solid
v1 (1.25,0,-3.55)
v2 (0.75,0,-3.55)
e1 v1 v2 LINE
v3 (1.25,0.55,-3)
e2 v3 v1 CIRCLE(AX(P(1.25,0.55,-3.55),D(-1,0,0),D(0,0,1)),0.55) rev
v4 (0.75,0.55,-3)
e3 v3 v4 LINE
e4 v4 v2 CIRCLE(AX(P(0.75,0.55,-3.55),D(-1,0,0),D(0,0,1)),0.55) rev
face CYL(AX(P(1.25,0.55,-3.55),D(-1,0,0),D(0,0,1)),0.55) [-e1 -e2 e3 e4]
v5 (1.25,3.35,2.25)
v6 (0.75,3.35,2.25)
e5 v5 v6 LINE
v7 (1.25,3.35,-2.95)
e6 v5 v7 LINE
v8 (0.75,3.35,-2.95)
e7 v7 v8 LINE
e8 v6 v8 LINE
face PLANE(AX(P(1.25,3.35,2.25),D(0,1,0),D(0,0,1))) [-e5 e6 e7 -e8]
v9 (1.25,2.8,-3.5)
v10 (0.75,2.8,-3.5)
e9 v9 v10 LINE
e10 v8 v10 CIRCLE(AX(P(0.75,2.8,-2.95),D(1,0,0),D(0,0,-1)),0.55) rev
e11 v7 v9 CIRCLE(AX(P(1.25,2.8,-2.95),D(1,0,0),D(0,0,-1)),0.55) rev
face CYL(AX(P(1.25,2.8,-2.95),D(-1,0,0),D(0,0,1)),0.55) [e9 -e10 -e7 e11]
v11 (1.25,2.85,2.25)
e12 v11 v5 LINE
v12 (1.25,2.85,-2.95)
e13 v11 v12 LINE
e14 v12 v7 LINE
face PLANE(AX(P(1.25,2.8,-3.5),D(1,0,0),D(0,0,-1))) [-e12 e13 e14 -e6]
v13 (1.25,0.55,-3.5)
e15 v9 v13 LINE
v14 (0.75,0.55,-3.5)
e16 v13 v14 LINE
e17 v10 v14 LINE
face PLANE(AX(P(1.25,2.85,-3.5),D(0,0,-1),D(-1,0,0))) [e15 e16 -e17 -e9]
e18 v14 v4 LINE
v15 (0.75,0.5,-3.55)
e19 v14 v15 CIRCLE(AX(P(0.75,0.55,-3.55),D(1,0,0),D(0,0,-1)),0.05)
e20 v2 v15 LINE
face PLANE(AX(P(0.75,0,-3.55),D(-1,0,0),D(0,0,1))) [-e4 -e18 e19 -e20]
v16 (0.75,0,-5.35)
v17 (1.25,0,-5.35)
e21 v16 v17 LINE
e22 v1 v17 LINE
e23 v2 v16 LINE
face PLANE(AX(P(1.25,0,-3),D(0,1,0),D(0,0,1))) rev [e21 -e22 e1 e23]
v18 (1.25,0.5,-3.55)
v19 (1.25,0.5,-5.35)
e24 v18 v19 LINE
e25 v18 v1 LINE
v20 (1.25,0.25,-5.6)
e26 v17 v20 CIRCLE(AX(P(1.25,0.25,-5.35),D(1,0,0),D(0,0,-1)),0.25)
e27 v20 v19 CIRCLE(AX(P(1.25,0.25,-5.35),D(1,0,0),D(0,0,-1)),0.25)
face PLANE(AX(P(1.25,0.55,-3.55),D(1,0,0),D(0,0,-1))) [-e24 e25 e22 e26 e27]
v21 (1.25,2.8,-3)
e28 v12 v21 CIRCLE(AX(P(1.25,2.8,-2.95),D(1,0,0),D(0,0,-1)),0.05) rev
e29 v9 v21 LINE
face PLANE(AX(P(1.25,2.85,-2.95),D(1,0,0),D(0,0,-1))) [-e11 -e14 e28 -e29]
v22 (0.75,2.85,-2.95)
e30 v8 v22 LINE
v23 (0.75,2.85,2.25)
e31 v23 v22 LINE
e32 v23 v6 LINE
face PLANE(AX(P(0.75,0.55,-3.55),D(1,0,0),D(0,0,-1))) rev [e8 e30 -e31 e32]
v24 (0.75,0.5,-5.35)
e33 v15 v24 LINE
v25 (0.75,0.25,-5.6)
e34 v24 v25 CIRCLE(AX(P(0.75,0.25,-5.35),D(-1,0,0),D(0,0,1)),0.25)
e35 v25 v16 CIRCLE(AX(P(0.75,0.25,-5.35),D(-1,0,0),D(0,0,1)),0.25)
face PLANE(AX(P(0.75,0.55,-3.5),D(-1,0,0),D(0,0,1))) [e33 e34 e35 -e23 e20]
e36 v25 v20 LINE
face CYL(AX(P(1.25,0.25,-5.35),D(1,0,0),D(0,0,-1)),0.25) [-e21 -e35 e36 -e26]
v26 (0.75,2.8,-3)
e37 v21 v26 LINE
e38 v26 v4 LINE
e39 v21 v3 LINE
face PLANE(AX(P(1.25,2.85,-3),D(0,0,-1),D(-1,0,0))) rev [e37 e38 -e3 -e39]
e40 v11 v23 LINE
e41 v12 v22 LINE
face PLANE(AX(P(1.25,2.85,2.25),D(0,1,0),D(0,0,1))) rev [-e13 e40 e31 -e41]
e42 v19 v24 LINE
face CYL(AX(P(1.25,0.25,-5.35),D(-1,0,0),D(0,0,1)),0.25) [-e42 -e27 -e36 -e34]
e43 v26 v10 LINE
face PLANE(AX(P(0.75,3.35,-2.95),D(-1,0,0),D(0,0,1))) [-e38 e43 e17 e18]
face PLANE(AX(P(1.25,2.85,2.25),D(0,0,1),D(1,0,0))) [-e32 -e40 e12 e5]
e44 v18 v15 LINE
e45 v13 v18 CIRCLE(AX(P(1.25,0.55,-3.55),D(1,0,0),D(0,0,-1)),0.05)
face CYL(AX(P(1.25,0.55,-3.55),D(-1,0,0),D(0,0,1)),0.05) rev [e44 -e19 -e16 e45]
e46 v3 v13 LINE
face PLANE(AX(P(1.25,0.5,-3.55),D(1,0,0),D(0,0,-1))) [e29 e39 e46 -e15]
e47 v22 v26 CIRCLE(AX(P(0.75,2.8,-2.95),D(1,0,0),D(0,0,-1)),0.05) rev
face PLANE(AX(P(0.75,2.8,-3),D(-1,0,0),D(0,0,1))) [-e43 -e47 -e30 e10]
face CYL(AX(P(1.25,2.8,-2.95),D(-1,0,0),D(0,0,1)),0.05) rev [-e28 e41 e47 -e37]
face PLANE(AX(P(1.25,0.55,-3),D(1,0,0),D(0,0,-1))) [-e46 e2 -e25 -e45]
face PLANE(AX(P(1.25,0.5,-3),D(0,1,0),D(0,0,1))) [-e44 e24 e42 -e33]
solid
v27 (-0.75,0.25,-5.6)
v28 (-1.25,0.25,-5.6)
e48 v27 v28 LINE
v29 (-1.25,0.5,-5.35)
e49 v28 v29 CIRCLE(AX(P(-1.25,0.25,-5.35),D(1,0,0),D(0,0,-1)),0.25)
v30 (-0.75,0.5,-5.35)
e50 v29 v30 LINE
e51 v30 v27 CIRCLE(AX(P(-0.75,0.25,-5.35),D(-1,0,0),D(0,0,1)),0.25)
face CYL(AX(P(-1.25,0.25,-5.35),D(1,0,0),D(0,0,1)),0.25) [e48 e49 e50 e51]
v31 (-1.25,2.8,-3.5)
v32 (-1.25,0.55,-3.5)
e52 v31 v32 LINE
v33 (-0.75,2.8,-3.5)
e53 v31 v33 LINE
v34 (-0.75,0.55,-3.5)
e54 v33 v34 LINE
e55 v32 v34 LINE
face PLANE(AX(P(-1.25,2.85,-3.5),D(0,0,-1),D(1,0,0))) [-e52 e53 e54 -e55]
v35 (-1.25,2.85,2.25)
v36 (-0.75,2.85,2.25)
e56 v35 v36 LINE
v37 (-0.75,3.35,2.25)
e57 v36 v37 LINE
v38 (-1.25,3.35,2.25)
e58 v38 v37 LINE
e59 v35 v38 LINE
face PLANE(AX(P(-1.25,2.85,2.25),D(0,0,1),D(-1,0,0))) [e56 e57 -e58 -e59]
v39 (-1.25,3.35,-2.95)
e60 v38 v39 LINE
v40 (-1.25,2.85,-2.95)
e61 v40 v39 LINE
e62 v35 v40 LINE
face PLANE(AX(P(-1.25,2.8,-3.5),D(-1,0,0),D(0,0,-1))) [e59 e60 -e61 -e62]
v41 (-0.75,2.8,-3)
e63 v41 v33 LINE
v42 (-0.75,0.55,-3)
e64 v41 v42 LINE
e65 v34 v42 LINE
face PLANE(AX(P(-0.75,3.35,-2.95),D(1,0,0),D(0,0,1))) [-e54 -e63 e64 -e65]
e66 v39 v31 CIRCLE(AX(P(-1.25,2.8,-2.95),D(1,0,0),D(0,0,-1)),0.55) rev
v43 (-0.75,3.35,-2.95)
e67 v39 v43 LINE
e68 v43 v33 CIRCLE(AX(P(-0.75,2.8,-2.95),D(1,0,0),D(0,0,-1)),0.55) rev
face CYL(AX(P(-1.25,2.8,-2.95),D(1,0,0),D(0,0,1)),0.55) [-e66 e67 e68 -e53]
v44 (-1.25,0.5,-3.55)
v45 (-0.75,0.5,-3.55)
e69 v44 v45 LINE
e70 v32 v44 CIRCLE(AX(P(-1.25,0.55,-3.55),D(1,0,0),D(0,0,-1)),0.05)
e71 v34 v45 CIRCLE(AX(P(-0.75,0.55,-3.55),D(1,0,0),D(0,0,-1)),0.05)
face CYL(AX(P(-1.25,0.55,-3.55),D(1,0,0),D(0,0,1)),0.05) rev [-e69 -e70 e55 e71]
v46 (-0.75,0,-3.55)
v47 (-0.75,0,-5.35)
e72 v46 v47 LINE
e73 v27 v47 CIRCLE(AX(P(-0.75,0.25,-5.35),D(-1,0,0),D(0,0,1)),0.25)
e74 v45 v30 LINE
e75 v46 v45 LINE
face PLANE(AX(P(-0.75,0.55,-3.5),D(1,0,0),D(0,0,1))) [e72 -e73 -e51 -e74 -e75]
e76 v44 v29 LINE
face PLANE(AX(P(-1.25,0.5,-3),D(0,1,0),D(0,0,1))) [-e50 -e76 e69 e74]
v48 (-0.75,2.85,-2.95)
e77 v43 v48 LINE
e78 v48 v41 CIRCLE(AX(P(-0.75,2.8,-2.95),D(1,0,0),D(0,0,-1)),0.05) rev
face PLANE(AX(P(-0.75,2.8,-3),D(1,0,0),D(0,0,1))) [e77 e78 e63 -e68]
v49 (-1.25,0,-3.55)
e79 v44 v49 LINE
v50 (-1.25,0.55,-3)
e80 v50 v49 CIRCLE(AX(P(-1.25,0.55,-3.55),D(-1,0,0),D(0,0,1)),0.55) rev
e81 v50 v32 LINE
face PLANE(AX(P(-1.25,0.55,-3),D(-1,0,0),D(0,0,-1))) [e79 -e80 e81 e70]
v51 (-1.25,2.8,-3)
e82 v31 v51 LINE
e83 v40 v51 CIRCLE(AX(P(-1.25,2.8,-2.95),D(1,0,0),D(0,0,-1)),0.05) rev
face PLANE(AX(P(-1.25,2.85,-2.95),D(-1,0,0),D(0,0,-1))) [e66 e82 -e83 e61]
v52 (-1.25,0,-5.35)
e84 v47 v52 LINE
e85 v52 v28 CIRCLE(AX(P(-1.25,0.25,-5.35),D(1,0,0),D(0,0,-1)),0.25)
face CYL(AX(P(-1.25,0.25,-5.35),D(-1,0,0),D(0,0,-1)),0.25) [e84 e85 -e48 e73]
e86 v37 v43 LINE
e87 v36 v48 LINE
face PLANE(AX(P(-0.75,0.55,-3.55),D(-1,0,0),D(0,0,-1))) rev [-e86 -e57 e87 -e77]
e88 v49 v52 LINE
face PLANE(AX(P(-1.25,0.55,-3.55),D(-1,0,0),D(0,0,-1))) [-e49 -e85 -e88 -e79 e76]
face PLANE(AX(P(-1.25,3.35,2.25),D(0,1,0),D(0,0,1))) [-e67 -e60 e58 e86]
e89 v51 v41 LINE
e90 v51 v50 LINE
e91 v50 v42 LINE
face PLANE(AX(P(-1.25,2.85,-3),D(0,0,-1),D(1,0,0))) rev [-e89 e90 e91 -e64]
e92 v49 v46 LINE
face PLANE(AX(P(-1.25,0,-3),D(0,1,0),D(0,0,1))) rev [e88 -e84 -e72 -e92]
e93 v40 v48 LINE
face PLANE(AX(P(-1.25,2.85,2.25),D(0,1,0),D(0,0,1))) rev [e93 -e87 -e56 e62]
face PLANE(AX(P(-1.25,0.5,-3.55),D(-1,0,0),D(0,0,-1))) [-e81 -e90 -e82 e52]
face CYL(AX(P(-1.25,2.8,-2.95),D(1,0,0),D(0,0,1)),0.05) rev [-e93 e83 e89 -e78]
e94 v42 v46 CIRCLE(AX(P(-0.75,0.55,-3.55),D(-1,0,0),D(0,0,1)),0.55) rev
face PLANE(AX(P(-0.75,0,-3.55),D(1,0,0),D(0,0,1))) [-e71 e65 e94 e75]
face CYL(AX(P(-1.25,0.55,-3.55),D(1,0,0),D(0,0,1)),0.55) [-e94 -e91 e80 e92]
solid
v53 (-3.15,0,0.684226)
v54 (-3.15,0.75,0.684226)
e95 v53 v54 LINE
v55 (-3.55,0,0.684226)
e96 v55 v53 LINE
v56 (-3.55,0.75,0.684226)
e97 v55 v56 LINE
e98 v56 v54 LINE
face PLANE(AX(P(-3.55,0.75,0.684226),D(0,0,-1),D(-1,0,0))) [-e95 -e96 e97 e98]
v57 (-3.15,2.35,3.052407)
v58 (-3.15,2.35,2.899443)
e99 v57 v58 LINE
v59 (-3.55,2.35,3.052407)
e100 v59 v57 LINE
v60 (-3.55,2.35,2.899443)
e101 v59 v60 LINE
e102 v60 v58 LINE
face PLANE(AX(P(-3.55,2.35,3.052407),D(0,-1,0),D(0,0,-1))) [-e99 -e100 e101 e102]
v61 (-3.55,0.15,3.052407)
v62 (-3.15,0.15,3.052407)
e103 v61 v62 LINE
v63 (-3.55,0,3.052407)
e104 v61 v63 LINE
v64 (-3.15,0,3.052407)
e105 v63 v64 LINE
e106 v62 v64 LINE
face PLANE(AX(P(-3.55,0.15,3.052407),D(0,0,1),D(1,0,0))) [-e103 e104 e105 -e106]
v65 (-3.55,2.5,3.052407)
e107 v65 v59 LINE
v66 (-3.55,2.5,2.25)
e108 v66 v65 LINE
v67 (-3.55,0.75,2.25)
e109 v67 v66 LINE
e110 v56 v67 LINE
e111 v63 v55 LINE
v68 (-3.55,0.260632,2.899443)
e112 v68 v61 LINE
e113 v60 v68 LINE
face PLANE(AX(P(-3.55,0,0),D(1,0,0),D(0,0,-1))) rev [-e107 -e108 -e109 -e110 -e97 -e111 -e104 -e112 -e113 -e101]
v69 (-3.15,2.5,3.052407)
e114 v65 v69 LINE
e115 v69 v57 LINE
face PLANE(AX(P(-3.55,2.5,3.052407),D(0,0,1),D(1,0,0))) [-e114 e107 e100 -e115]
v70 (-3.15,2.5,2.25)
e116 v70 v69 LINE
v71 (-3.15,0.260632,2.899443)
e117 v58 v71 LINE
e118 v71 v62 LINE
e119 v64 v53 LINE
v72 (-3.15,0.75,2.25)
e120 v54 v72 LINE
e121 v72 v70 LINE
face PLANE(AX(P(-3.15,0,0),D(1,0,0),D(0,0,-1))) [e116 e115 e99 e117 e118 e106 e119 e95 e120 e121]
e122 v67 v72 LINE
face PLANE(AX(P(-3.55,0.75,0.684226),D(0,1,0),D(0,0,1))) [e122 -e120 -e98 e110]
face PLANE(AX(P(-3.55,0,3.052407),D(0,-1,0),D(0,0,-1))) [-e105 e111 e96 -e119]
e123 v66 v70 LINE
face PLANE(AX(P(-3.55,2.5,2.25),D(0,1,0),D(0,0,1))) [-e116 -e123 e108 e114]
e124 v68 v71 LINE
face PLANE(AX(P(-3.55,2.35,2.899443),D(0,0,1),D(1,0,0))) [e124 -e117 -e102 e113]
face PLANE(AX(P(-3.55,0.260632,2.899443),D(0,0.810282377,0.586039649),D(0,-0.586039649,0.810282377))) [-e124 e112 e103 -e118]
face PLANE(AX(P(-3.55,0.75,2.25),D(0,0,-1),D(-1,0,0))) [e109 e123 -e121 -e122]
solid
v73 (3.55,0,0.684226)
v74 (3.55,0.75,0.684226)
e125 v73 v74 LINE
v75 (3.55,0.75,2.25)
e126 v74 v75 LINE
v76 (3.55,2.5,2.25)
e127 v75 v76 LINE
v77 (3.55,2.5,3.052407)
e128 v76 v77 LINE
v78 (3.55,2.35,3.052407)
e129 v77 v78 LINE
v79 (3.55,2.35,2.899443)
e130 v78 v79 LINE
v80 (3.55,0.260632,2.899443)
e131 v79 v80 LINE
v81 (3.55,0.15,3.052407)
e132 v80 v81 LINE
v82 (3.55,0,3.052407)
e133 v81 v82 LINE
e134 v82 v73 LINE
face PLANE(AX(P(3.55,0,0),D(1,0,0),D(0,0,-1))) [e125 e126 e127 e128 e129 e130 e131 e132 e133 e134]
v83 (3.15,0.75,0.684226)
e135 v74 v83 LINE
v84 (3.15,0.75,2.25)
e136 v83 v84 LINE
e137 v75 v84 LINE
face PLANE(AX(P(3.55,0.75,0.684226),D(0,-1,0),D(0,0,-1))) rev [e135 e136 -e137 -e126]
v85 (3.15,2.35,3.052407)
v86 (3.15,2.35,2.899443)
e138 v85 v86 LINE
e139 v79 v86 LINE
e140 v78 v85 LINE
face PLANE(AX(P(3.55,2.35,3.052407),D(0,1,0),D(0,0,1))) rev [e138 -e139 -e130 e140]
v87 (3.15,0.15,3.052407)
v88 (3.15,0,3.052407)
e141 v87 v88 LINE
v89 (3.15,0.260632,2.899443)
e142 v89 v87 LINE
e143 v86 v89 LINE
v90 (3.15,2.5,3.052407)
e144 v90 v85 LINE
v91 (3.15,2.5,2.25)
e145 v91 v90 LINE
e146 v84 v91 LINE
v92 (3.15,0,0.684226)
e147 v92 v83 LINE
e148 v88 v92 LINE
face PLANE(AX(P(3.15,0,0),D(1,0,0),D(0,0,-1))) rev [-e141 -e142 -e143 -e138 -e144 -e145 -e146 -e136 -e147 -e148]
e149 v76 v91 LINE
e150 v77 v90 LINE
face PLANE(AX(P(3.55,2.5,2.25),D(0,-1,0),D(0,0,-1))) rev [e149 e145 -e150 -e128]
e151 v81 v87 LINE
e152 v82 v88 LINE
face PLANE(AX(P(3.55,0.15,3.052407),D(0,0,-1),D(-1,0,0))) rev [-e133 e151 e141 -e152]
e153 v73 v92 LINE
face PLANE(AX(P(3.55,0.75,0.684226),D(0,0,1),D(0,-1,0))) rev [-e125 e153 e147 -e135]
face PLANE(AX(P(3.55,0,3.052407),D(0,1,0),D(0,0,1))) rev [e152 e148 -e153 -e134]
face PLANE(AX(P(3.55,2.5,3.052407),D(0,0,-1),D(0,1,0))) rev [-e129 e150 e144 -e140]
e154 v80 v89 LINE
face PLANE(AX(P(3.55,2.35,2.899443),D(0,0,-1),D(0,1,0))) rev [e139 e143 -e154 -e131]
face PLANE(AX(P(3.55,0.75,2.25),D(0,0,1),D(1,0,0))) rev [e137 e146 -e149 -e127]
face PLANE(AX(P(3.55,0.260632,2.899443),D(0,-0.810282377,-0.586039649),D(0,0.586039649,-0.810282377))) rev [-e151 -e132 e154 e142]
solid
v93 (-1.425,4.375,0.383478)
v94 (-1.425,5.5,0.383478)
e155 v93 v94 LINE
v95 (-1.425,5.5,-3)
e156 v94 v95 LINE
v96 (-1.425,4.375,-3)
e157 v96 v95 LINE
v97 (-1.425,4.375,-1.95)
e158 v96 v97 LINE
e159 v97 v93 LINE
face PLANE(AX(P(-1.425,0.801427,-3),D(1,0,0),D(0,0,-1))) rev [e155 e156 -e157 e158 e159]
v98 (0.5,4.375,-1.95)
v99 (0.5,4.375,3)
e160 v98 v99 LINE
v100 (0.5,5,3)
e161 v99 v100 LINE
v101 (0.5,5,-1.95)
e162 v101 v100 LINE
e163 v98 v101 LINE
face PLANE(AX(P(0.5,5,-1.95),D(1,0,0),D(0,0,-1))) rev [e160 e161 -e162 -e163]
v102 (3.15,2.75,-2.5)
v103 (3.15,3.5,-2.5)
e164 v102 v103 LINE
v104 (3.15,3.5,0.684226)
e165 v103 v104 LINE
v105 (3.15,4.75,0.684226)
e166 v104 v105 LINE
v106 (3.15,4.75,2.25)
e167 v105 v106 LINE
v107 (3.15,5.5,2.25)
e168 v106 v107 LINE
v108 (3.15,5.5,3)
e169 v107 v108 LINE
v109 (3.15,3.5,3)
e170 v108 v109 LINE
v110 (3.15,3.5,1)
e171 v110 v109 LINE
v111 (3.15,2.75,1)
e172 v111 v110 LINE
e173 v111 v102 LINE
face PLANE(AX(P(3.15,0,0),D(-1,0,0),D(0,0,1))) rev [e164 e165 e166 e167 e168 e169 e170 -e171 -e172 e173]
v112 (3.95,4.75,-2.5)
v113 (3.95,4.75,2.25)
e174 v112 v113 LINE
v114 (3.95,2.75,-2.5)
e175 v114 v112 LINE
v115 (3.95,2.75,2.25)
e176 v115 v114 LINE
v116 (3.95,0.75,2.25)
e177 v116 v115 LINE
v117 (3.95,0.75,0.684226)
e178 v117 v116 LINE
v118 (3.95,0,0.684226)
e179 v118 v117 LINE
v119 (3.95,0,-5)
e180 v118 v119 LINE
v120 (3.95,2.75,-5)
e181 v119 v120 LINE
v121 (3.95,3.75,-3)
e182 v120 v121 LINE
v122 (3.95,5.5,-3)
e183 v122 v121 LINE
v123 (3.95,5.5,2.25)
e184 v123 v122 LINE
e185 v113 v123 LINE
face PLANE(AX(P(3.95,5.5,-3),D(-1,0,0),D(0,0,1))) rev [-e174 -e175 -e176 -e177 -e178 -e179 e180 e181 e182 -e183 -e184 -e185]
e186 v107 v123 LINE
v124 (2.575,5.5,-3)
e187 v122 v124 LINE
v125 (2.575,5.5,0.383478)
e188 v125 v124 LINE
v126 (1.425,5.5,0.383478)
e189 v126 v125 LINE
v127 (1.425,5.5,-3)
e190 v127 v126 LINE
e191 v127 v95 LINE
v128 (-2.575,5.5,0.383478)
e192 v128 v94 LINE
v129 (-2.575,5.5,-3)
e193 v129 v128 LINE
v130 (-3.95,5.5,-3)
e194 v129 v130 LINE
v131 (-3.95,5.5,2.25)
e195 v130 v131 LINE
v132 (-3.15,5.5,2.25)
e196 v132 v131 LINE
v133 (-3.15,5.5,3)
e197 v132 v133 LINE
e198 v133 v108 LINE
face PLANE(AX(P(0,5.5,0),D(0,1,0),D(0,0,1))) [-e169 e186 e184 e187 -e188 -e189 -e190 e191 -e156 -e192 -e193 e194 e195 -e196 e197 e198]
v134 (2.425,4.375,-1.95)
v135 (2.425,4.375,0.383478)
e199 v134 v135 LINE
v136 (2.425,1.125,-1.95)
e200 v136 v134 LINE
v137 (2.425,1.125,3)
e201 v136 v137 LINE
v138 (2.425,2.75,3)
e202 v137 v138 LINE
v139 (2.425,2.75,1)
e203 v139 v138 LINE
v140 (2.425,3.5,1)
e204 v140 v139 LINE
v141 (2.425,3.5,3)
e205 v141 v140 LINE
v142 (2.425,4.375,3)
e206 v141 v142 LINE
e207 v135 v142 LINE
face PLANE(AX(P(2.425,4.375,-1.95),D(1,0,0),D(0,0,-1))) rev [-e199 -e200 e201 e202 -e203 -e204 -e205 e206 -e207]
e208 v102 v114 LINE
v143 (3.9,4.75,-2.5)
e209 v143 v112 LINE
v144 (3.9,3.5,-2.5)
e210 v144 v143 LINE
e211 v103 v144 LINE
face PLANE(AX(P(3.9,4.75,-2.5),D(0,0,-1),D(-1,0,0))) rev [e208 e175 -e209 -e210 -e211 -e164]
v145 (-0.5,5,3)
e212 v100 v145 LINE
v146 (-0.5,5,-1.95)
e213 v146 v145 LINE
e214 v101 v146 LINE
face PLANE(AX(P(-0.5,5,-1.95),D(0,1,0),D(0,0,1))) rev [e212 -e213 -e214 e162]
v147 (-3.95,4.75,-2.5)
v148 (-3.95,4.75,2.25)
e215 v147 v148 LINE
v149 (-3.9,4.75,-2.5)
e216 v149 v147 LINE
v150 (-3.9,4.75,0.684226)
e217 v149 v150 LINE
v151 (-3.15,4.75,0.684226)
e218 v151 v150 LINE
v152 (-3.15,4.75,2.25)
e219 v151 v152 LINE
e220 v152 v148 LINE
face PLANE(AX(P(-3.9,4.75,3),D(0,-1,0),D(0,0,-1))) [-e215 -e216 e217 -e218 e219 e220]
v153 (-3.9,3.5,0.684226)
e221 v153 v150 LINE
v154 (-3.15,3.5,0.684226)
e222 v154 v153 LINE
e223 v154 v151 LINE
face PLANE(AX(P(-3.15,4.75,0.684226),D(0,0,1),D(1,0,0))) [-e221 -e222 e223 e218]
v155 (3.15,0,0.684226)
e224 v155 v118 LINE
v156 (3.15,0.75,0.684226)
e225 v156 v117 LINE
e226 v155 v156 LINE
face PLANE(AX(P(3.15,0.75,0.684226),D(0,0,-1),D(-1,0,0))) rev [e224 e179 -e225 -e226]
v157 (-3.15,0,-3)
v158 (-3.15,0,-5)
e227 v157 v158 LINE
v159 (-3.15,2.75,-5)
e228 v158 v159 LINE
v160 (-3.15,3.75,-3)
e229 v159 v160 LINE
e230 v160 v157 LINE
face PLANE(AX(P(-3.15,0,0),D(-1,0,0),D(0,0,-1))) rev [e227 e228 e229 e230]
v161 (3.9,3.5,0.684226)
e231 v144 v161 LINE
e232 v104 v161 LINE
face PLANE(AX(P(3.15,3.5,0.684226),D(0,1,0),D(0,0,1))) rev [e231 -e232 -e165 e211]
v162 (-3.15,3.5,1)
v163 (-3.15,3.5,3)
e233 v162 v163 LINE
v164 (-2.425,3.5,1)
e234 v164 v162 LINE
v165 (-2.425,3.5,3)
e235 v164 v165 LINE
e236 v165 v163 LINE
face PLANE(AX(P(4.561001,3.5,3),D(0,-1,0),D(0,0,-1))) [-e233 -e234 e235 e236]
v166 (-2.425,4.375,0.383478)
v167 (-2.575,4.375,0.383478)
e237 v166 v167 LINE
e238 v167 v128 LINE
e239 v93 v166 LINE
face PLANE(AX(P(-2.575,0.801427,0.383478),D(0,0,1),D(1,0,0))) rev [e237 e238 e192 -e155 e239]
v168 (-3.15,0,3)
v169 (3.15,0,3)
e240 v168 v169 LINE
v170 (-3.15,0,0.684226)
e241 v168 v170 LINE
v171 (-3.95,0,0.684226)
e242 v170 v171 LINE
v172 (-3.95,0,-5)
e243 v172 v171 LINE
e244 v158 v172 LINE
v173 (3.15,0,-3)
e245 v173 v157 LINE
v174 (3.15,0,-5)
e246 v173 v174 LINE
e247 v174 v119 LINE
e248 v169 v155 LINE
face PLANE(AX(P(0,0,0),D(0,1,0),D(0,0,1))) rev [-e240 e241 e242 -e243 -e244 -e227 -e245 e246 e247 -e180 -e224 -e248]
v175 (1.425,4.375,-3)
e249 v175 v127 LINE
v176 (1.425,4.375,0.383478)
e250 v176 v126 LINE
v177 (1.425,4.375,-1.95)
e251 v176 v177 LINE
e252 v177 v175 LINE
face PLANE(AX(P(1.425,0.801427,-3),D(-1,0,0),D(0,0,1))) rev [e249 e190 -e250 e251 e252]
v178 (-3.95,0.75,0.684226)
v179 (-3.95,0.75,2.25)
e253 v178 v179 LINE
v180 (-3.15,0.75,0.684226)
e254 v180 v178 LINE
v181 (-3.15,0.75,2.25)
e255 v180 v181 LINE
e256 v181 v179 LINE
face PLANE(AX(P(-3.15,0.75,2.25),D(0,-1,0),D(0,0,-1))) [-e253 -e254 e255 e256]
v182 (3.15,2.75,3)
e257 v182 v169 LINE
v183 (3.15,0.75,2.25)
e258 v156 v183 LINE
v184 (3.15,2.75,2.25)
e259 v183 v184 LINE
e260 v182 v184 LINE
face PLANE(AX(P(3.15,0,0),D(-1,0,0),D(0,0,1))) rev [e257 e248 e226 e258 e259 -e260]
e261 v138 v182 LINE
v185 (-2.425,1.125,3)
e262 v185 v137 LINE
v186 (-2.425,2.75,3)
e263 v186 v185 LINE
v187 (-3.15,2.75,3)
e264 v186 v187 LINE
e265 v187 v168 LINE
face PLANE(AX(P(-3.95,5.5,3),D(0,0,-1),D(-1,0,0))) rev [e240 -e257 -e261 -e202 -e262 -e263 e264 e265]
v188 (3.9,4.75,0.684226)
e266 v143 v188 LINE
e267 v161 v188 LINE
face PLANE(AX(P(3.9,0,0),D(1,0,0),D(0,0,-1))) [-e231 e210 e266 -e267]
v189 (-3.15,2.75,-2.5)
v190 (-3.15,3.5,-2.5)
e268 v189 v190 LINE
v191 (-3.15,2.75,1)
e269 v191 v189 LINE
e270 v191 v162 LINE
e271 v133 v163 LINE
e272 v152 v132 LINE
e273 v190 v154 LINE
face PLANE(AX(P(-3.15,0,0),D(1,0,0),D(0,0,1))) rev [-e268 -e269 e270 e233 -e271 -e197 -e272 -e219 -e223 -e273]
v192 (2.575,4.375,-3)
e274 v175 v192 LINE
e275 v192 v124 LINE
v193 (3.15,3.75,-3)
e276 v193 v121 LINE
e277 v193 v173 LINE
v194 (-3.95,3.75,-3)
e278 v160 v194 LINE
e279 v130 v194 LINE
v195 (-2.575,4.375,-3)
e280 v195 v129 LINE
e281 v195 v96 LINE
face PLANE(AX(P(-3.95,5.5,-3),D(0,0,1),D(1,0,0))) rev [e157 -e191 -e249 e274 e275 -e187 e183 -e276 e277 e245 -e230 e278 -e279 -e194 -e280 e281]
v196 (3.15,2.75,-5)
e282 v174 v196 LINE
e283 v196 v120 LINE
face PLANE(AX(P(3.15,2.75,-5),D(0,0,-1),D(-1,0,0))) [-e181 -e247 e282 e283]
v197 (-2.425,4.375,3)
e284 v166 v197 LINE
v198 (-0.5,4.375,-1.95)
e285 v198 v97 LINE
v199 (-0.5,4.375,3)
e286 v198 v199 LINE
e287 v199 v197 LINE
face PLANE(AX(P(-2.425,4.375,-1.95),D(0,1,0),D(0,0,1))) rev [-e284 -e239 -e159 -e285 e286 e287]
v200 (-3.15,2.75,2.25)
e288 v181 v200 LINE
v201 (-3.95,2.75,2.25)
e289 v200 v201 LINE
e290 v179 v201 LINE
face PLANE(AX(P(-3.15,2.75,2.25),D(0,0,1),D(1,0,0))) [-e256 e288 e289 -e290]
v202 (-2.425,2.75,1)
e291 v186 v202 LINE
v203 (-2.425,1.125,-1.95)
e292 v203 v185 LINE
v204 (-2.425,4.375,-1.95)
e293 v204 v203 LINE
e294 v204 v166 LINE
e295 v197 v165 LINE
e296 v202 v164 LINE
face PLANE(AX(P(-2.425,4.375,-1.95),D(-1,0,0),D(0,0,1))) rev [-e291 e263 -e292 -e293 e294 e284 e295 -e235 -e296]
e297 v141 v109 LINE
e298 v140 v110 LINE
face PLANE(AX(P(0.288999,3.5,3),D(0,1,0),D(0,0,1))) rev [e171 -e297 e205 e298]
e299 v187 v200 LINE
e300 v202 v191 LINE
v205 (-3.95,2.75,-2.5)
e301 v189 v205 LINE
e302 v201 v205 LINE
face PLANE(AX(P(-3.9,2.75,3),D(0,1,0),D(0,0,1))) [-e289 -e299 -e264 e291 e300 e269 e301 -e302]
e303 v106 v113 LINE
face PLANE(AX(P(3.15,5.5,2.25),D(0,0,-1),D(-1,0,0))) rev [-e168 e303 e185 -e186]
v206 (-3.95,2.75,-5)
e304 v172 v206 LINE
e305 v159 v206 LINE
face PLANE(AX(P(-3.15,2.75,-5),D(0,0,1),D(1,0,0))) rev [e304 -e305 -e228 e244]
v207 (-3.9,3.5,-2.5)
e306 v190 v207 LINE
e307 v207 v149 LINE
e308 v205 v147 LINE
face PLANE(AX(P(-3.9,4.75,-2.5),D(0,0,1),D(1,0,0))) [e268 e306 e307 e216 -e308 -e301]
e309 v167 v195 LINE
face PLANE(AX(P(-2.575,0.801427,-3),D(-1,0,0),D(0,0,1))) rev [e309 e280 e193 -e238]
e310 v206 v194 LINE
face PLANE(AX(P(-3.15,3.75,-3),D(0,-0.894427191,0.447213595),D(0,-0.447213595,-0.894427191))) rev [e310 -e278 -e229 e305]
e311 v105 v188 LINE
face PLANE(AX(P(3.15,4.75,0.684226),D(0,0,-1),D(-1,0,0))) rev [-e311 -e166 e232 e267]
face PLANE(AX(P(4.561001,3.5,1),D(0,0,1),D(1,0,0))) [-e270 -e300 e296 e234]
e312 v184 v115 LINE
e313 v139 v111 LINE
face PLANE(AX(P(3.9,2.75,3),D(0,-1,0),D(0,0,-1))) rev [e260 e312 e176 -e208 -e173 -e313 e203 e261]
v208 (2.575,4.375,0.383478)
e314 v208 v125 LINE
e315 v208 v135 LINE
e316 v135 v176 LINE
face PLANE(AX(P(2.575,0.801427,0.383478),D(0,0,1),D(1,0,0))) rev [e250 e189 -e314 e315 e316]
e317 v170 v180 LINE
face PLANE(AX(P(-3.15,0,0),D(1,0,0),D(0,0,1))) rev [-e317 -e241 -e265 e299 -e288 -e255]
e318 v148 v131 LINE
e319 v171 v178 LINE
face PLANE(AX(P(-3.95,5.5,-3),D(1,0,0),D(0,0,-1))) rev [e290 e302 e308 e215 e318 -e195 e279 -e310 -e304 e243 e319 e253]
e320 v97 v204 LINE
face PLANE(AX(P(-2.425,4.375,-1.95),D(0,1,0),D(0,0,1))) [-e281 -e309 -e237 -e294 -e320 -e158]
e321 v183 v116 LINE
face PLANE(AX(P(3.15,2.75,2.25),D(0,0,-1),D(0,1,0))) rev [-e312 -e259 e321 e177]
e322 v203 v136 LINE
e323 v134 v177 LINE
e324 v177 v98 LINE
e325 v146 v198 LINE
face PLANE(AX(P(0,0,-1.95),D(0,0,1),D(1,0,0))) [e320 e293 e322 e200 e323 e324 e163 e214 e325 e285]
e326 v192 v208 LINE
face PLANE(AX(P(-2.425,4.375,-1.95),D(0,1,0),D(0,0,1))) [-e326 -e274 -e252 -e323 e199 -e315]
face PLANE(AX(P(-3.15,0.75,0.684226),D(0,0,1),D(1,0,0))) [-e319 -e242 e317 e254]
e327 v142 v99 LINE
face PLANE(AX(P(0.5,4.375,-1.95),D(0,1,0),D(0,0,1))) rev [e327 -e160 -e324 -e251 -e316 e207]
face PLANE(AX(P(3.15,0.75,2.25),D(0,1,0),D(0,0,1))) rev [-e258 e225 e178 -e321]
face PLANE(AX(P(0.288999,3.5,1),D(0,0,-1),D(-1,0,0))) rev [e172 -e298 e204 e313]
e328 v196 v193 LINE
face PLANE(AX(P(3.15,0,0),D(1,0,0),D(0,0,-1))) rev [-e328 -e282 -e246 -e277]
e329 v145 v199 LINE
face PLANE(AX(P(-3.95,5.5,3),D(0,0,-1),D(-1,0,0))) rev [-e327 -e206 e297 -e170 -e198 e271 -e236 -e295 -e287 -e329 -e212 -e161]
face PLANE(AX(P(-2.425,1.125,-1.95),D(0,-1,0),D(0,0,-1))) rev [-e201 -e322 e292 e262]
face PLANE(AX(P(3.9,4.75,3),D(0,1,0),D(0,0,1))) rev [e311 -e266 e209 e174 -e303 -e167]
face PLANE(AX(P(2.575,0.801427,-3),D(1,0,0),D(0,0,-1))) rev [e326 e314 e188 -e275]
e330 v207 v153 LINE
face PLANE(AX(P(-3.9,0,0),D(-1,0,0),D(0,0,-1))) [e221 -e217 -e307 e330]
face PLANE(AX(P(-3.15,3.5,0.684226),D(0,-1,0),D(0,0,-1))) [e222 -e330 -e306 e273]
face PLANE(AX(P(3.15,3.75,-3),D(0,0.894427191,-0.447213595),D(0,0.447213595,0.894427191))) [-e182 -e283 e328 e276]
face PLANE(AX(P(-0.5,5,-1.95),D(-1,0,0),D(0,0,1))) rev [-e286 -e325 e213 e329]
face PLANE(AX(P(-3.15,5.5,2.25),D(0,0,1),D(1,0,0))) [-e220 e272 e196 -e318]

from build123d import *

# Parameters (mm, degrees)
SKETCH1_W           = 7.9
SKETCH1_H           = 6
BOSS_EXTRUDE1_DEPTH = 5.5
CUT_EXTRUDE1_DEPTH  = 4.95
SKETCH3_W           = 5.5
SKETCH3_H           = 2
CUT_EXTRUDE2_DEPTH  = 0.05
CUT_EXTRUDE3_DEPTH  = 0.8
SKETCH5_W           = 1.15
SKETCH5_H           = 3.383478064
CUT_EXTRUDE4_DEPTH  = 1.125
BOSS_EXTRUDE2_DEPTH = 0.8
SKETCH7_W           = 2
SKETCH7_H           = 0.75
CUT_EXTRUDE5_DEPTH  = 5.575
BOSS_EXTRUDE4_DEPTH = 0.4
BASE_FLANGE1_DEPTH  = 0.25
BOSS_EXTRUDE5_DEPTH = 0.4
FILLET1_R           = 0.25


# Sheet-metal steps are written as plain solids
with BuildPart() as part:
    # Sketch1 → Boss-Extrude1 (new body)
    with BuildSketch(Plane(origin=(0, 0, 0), x_dir=(1, 0, 0), z_dir=(0, 1, 0))):
        Rectangle(SKETCH1_W, SKETCH1_H)
    extrude(amount=BOSS_EXTRUDE1_DEPTH)

    # Sketch2 → Cut-Extrude1 (cut)
    with BuildSketch(Plane.XY.offset(3)):
        Polygon((-2.425, 4.375), (-0.5, 4.375), (-0.5, 5), (0.5, 5), (0.5, 4.375), (2.425, 4.375), (2.425, 1.125), (-2.425, 1.125), align=None)
    extrude(amount=-CUT_EXTRUDE1_DEPTH, mode=Mode.SUBTRACT)

    # Sketch3 → Cut-Extrude2 (cut)
    with BuildSketch(Plane(origin=(3.95, 0, 0), x_dir=(0, 0, -1), z_dir=(1, 0, 0))):
        with Locations((-0.25, 3.75)):
            Rectangle(SKETCH3_W, SKETCH3_H)
    cut_extrude2 = extrude(amount=-CUT_EXTRUDE2_DEPTH, mode=Mode.SUBTRACT)

    # Mirror1: Cut-Extrude2 across plane
    add(cut_extrude2.mirror(Plane(origin=(0, 0, 0), x_dir=(0, 0, 1), z_dir=(1, 0, 0))), mode=Mode.SUBTRACT)

    # Sketch4 → Cut-Extrude3 (cut)
    with BuildSketch(Plane(origin=(3.95, 0, 0), x_dir=(0, 0, -1), z_dir=(1, 0, 0))):
        Polygon((-2.25, 5.5), (-2.25, 4.75), (-0.684226185, 4.75), (-0.684226185, 3.5), (2.5, 3.5), (2.5, 2.75), (-2.25, 2.75), (-2.25, 0.75), (-0.684226185, 0.75), (-0.684226185, 0), (-3, 0), (-3, 5.5), align=None)
    cut_extrude3 = extrude(amount=-CUT_EXTRUDE3_DEPTH, mode=Mode.SUBTRACT)

    # Mirror2: Cut-Extrude3 across plane
    add(cut_extrude3.mirror(Plane(origin=(0, 0, 0), x_dir=(0, 0, 1), z_dir=(1, 0, 0))), mode=Mode.SUBTRACT)

    # Sketch5 → Cut-Extrude4 (cut)
    with BuildSketch(Plane(origin=(0, 5.5, 0), x_dir=(1, 0, 0), z_dir=(0, 1, 0))):
        with Locations((-2, 1.308260968)):
            Rectangle(SKETCH5_W, SKETCH5_H)
        with Locations((2, 1.308260968)):
            Rectangle(SKETCH5_W, SKETCH5_H)
    extrude(amount=-CUT_EXTRUDE4_DEPTH, mode=Mode.SUBTRACT)

    # Sketch6 → Boss-Extrude2 (add)
    with BuildSketch(Plane(origin=(3.95, 0, 0), x_dir=(0, 0, -1), z_dir=(1, 0, 0))):
        Polygon((3, 3.75), (5, 2.75), (5, 0), (3, 0), align=None)
    boss_extrude2 = extrude(amount=-BOSS_EXTRUDE2_DEPTH)

    # Mirror3: Boss-Extrude2 across plane
    add(boss_extrude2.mirror(Plane(origin=(0, 0, 0), x_dir=(0, 0, 1), z_dir=(1, 0, 0))))

    # Sketch7 → Cut-Extrude5 (cut)
    with BuildSketch(Plane(origin=(3.15, 0, 0), x_dir=(0, 0, -1), z_dir=(1, 0, 0))):
        with Locations((-2, 3.125)):
            Rectangle(SKETCH7_W, SKETCH7_H)
    cut_extrude5 = extrude(amount=-CUT_EXTRUDE5_DEPTH, mode=Mode.SUBTRACT)

    # Mirror4: Cut-Extrude5 across plane
    add(cut_extrude5.mirror(Plane(origin=(0, 0, 0), x_dir=(0, 0, 1), z_dir=(1, 0, 0))), mode=Mode.SUBTRACT)


with BuildPart() as body_2:
    # Sketch8 → Boss-Extrude4 (new body)
    with BuildSketch(Plane(origin=(3.15, 0, 0), x_dir=(0, 0, -1), z_dir=(1, 0, 0))):
        Polygon((-2.25, 2.5), (-3.05240723, 2.5), (-3.05240723, 2.35), (-2.899443331, 2.35), (-2.899443331, 0.260631692), (-3.05240723, 0.15), (-3.05240723, 0), (-0.684226185, 0), (-0.684226185, 0.75), (-2.25, 0.75), align=None)
    extrude(amount=BOSS_EXTRUDE4_DEPTH)


with BuildPart() as body_3:
    # Sketch9 → Base-Flange1 (new, symmetric)
    with BuildSketch(Plane(origin=(1, 0, 0), x_dir=(0, 0, -1), z_dir=(1, 0, 0))):
        with BuildLine():
            Line((-2.25, 2.85), (2.95, 2.85))
            ThreePointArc((2.95, 2.85), (2.985355339, 2.835355339), (3, 2.8))
            Line((3, 2.8), (3, 0.55))
            ThreePointArc((3, 0.55), (3.16109127, 0.16109127), (3.55, 0))
            Line((3.55, 0), (5.6, 0))
            Line((5.6, 0), (5.6, 0.5))
            Line((5.6, 0.5), (3.55, 0.5))
            ThreePointArc((3.55, 0.5), (3.514644661, 0.514644661), (3.5, 0.55))
            Line((3.5, 0.55), (3.5, 2.8))
            ThreePointArc((3.5, 2.8), (3.33890873, 3.18890873), (2.95, 3.35))
            Line((2.95, 3.35), (-2.25, 3.35))
            Line((-2.25, 3.35), (-2.25, 2.85))
        make_face()
    extrude(amount=BASE_FLANGE1_DEPTH, both=True)

    # Fillet1
    fillet1_edges = [body_3.edges().sort_by_distance(p)[0] for p in [
        (1, 0, -5.6),
        (1, 0.5, -5.6),
    ]]
    fillet(fillet1_edges, radius=FILLET1_R - 0.0001)  # a hair under: the kernel refuses the full size


with BuildPart() as body_4:
    # Sketch14 → Boss-Extrude5 (new body)
    with BuildSketch(Plane(origin=(-3.15, 0, -3.15), x_dir=(0, 0, -1), z_dir=(1, 0, 0))):
        Polygon((-5.4, 2.5), (-6.20240723, 2.5), (-6.20240723, 2.35), (-6.049443331, 2.35), (-6.049443331, 0.260631692), (-6.20240723, 0.15), (-6.20240723, 0), (-3.834226185, 0), (-3.834226185, 0.75), (-5.4, 0.75), align=None)
    extrude(amount=-BOSS_EXTRUDE5_DEPTH)


with BuildPart() as body_5:
    # Mirror7: mirrored copy
    add(body_3.part.mirror(Plane(origin=(0, 0, 0), x_dir=(0, 0, 1), z_dir=(1, 0, 0))))


solid = Compound([part.part, body_2.part, body_3.part, body_4.part, body_5.part])
